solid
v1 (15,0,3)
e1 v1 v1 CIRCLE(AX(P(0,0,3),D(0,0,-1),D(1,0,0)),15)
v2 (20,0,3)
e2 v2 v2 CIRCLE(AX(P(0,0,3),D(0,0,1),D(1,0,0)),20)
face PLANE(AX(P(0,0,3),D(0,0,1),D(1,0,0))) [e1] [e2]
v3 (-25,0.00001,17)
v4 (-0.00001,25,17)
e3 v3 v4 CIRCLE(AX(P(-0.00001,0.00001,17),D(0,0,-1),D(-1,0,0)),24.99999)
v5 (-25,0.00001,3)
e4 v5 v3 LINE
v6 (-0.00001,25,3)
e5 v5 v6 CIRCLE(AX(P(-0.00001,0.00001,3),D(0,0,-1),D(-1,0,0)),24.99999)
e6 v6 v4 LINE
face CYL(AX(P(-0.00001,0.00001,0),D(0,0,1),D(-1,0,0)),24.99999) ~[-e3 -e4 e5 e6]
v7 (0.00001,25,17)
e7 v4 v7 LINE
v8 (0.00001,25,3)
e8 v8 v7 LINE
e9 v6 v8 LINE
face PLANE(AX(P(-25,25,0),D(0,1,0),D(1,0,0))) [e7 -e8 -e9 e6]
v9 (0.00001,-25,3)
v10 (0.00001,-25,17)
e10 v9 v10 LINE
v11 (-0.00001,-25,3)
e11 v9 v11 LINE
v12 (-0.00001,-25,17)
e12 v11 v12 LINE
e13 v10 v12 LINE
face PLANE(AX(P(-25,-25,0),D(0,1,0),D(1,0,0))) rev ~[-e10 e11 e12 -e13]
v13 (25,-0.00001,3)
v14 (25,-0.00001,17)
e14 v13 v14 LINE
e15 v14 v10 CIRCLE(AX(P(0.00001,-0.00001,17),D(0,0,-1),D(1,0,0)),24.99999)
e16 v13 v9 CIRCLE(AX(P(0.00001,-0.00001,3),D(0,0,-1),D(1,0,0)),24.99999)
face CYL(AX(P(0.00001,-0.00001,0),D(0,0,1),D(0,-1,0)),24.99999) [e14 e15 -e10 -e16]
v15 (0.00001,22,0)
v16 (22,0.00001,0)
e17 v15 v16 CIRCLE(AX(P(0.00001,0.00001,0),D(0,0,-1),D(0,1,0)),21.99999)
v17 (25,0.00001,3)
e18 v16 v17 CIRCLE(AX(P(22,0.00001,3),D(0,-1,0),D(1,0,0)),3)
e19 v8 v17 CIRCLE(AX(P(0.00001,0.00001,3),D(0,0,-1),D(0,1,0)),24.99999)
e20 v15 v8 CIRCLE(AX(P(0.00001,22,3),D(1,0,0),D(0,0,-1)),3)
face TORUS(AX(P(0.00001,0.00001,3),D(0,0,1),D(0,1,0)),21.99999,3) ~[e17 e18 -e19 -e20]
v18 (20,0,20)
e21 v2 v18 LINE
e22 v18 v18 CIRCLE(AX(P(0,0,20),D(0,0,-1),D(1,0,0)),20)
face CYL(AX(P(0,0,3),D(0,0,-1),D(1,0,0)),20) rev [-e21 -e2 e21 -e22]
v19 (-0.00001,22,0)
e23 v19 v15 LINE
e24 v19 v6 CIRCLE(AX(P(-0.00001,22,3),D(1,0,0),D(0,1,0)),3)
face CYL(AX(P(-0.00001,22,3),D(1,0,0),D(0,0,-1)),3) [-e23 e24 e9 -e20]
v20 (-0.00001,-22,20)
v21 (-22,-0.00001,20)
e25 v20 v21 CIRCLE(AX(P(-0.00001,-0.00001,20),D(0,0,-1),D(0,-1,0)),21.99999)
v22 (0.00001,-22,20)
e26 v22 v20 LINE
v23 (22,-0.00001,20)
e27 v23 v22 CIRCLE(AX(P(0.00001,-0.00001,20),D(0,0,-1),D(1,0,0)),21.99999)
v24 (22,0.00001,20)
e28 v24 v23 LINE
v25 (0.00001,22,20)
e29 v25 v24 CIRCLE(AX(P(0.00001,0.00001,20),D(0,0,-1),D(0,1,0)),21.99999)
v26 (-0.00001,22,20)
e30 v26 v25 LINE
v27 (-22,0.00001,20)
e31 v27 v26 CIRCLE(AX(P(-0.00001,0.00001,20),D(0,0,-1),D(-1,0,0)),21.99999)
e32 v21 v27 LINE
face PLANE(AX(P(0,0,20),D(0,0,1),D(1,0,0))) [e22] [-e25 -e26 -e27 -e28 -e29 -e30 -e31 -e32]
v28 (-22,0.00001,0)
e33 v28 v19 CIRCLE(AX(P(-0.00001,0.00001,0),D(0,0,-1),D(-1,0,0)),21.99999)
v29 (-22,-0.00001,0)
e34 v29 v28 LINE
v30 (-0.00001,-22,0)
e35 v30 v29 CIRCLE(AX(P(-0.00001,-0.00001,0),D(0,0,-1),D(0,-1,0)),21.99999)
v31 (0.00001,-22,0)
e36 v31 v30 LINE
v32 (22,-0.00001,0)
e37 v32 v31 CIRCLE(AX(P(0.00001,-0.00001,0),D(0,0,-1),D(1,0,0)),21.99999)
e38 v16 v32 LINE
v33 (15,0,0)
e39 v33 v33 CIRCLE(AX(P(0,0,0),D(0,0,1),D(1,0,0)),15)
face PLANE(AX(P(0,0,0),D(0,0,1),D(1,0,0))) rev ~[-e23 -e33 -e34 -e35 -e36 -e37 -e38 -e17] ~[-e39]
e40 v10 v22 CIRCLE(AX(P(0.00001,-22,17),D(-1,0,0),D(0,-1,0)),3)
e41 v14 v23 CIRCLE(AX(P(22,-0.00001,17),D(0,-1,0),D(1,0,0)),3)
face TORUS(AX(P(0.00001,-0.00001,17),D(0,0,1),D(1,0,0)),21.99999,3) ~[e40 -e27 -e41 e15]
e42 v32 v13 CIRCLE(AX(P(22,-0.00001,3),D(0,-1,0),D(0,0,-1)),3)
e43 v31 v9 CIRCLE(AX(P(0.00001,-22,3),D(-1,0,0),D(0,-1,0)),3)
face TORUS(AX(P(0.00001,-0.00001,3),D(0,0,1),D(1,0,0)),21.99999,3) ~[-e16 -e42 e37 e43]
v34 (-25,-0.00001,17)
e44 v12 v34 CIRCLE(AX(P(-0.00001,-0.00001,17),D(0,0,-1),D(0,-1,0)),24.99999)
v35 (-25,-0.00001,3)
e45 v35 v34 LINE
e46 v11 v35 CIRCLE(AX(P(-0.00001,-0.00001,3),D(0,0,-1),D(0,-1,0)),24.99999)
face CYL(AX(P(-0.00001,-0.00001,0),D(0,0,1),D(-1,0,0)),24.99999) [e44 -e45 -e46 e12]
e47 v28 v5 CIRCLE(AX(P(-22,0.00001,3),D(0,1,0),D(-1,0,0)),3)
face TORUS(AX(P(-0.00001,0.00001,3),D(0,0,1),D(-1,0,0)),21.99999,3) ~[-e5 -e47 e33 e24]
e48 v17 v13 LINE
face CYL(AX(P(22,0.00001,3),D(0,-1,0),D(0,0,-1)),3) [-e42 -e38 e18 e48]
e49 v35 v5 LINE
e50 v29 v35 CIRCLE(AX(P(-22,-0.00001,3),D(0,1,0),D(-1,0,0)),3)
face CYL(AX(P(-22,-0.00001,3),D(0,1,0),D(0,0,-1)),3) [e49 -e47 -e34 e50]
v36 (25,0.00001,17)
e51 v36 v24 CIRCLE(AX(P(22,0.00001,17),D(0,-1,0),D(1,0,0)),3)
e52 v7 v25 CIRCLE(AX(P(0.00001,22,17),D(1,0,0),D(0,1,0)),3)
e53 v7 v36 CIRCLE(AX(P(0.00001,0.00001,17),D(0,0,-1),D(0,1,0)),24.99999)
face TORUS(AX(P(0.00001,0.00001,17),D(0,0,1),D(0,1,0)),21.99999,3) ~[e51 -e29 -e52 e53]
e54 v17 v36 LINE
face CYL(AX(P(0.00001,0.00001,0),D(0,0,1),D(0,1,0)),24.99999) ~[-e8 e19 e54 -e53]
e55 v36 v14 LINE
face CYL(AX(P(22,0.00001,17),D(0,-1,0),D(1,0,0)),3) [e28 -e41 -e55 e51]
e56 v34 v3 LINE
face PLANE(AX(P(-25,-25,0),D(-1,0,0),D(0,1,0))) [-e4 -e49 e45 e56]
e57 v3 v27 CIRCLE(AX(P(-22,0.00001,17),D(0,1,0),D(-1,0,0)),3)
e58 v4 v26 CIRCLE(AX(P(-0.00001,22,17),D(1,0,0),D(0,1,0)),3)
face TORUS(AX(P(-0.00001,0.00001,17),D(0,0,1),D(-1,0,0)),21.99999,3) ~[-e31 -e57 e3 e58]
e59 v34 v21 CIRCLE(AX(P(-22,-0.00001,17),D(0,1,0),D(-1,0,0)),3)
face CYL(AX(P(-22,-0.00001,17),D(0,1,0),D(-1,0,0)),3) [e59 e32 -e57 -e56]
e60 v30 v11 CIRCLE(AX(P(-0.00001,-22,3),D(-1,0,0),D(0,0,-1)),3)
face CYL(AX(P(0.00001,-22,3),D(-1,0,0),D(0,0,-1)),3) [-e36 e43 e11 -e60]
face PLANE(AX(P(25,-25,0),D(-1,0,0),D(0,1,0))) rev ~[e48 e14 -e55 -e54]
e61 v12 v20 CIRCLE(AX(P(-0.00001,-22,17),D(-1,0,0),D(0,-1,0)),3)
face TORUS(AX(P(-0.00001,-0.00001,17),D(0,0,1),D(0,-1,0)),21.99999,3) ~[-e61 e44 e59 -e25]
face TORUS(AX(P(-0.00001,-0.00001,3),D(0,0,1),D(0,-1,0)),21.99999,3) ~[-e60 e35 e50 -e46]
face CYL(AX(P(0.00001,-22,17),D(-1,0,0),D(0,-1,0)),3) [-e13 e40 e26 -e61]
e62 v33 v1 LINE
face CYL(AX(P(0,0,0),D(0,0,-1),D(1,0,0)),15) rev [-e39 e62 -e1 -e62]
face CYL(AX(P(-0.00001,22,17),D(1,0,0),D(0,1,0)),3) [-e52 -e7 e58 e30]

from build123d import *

# Parameters (mm, degrees)
F0_W     = 50
F0_H     = 50
F0_R     = 15
F1_DEPTH = 20
F2_R     = 20
F3_DEPTH = 20
F6_R     = 24.99999
F7_R     = 3


# Not quite as in the source:
# - a fillet or chamfer is up to 0.001 mm smaller than in the source, because OpenCascade refuses the exact size


with BuildPart() as f1:
    # F0 (on Top) → F1 (new body)
    with BuildSketch(Plane.XY):
        Rectangle(F0_W, F0_H)
        Circle(F0_R, mode=Mode.SUBTRACT)
    extrude(amount=F1_DEPTH)


with BuildPart() as f3:
    # F2 (on Top) → F3 (new body)
    with BuildSketch(Plane.XY):
        Circle(F2_R)
    extrude(amount=F3_DEPTH)


with BuildPart() as f3_1:
    # F4: moved
    add(f3.part.moved(Location((0, 0, 3))))


with BuildPart() as f1_1:
    add(f1.part)

    # F5: cut F3
    add(f3_1.part, mode=Mode.SUBTRACT)

    # F6 (radius 25 in the source; OpenCascade refuses exactly that, so slightly less here)
    f6_edges = [f1_1.edges().sort_by_distance(p)[0] for p in [
        (-25, 25, 10),
        (-25, -25, 10),
        (25, -25, 10),
        (25, 25, 10),
    ]]
    fillet(f6_edges, radius=F6_R)

    # F7
    f7_edges = [f1_1.edges().sort_by_distance(p)[0] for p in [
        (-17.677672, 17.677672, 0),
        (-17.677672, 17.677672, 20),
    ]]
    fillet(f7_edges, radius=F7_R)


solid = f1_1.part
